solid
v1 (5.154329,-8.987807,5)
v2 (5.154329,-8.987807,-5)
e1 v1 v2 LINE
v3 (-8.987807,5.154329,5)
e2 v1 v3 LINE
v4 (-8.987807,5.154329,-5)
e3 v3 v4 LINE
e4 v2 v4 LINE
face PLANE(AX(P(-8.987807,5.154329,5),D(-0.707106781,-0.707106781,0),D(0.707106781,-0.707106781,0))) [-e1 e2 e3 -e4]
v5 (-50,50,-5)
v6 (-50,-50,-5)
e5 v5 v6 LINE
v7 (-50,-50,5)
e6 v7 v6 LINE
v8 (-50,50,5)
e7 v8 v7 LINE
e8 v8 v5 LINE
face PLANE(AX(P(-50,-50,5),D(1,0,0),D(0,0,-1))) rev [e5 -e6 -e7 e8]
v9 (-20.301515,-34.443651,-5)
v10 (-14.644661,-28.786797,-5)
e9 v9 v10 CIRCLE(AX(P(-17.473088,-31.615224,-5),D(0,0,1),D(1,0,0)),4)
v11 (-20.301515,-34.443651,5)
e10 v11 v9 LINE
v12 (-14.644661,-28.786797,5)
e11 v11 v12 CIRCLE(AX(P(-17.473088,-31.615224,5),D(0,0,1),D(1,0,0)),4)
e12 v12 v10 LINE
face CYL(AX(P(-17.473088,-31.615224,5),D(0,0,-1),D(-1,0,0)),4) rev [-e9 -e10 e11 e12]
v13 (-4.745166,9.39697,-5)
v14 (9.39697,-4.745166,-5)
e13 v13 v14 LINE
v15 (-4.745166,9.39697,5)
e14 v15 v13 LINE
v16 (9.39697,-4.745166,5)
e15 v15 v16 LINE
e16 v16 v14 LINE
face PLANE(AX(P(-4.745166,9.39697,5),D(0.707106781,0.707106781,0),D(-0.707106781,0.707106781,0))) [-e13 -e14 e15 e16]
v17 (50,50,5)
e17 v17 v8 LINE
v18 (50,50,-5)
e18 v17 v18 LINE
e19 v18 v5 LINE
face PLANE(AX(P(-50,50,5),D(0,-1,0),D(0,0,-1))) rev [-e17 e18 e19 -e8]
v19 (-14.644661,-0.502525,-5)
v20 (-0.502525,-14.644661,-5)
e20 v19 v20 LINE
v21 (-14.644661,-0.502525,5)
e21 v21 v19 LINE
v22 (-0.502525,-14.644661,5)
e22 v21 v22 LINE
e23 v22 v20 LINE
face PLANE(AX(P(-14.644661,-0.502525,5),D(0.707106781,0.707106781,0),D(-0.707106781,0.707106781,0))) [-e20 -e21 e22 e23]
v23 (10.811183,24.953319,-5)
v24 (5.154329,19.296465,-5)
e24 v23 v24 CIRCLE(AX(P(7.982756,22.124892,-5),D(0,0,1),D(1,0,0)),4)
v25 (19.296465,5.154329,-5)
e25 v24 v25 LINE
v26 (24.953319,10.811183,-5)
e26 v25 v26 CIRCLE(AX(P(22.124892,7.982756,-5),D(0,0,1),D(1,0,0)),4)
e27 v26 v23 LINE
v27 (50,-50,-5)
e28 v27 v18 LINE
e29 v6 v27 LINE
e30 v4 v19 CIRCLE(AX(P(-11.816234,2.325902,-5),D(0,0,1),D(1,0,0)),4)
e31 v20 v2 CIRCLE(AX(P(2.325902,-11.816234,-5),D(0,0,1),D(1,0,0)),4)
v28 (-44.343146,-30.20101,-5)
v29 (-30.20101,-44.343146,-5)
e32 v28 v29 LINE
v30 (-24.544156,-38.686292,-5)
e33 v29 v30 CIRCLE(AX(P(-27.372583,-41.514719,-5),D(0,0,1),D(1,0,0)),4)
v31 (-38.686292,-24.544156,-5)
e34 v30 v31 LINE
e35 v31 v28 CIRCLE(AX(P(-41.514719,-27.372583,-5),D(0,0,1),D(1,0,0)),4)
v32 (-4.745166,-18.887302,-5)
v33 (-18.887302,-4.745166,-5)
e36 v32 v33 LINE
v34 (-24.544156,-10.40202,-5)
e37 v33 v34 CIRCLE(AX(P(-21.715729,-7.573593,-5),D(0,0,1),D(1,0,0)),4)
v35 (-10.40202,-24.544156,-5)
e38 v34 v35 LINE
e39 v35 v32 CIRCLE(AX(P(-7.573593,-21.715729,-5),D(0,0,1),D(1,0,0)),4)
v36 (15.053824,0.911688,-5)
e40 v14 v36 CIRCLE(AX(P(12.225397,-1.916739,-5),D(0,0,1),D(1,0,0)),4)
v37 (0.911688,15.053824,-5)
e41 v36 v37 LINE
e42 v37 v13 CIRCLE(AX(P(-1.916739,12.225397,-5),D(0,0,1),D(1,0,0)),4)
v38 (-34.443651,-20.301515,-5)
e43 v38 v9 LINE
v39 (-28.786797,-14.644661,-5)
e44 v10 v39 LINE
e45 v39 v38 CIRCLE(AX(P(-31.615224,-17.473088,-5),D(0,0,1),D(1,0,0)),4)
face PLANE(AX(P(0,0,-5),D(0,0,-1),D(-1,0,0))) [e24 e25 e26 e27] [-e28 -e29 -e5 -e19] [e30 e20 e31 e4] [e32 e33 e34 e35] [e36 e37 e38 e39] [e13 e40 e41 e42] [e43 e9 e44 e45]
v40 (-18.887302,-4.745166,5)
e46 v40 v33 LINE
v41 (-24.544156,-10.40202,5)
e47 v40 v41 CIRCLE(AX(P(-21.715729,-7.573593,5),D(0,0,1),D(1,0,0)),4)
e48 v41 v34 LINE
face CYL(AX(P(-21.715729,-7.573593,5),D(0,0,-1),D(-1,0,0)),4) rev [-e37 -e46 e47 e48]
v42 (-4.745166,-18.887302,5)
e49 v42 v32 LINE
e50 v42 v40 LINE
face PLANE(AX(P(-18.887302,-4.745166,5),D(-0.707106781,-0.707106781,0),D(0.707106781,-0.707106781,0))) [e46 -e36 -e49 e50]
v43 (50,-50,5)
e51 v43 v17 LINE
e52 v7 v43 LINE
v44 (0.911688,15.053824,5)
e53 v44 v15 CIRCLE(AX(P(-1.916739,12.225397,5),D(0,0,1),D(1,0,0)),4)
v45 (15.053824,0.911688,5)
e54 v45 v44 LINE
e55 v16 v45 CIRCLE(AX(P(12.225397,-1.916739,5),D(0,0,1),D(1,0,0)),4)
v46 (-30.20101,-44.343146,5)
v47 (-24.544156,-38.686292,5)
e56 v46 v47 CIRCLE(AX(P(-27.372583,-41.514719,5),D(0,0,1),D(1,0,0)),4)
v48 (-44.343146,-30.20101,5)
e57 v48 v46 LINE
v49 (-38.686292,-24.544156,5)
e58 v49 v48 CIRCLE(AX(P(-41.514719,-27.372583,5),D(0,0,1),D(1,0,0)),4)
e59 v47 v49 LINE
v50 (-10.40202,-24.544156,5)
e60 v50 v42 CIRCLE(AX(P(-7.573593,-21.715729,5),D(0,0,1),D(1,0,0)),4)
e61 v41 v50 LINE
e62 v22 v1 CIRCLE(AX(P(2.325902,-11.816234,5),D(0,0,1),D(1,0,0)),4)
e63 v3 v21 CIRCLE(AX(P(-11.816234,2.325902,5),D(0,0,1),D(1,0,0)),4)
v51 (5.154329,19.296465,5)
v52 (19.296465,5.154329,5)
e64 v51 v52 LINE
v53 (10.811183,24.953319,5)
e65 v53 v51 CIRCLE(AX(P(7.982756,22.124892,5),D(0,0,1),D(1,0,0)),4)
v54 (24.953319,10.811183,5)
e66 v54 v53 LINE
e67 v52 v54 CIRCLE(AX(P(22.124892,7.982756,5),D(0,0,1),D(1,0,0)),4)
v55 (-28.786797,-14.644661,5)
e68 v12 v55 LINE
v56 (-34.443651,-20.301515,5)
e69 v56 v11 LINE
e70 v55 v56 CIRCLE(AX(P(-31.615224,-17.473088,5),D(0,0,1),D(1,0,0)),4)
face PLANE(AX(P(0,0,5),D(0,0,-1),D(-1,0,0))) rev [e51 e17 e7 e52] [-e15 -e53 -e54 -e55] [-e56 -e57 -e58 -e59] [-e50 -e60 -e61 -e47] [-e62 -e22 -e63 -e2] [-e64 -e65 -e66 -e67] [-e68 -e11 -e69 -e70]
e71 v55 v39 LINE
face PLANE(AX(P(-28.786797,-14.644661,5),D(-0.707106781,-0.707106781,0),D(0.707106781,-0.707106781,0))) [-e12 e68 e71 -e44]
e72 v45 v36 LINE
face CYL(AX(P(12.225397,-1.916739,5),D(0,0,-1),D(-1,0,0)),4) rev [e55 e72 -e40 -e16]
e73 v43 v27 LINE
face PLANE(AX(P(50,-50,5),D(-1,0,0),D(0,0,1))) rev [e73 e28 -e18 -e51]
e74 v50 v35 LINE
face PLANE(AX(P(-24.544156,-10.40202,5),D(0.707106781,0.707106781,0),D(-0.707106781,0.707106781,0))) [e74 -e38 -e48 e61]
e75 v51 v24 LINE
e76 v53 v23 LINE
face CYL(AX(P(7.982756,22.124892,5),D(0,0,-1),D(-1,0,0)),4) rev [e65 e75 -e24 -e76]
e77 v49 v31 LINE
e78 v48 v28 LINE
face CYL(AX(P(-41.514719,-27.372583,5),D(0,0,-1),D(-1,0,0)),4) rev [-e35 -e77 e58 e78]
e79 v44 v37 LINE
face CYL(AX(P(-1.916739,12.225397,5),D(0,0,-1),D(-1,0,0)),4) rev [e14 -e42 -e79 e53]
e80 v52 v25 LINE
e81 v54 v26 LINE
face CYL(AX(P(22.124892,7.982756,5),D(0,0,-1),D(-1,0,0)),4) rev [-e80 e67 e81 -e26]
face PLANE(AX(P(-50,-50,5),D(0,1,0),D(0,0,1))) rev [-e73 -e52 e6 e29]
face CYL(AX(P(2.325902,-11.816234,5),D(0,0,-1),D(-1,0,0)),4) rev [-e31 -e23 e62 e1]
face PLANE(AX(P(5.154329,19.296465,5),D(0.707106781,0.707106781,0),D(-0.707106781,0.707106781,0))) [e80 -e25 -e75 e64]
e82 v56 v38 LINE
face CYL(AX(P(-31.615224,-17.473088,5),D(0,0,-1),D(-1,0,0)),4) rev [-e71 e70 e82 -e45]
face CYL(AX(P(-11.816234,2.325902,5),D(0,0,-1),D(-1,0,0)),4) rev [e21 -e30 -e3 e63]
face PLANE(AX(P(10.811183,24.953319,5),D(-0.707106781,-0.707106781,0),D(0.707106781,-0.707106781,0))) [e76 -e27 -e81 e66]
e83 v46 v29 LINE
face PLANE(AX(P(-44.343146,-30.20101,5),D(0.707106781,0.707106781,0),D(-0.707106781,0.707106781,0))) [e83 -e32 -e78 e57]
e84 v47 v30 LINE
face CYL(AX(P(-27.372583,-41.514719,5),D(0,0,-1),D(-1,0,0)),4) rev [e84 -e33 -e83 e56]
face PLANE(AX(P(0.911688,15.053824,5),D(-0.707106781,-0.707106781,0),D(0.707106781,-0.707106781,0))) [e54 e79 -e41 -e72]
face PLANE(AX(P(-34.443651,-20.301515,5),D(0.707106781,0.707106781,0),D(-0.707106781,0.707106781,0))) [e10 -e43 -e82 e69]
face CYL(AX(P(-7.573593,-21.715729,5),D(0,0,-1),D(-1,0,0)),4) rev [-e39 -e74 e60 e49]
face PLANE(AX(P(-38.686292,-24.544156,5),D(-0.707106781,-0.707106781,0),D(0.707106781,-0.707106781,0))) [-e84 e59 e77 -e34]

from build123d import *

# Parameters (mm, degrees)
SKETCH1_W           = 100
SKETCH1_H           = 100
BOSS_EXTRUDE1_DEPTH = 5
LPATTERN2_START     = -5
LPATTERN2_DEPTH     = 10


# Read off the part's stored shape, not the designer's step: LPattern2
with BuildPart() as part:
    # Sketch1 → Boss-Extrude1 (new, symmetric)
    with BuildSketch(Plane.XY):
        Rectangle(SKETCH1_W, SKETCH1_H)
        with BuildLine():
            Line((-38.686291501, -24.544155877), (-24.544155877, -38.686291501))
            ThreePointArc((-24.544155877, -38.686291501), (-24.544155877, -44.343145751), (-30.201010127, -44.343145751))
            Line((-30.201010127, -44.343145751), (-44.343145751, -30.201010127))
            ThreePointArc((-44.343145751, -30.201010127), (-44.343145751, -24.544155877), (-38.686291501, -24.544155877))
        make_face(mode=Mode.SUBTRACT)
    extrude(amount=BOSS_EXTRUDE1_DEPTH, both=True)

    # LPattern2 outline → LPattern2 (cut)
    with BuildSketch(Plane.XY.offset(LPATTERN2_START)):
        with BuildLine():
            Line((24.953318806, 10.811183182), (10.811183182, 24.953318806))
            ThreePointArc((10.811183182, 24.953318806), (5.154328933, 24.953318806), (5.154328933, 19.296464556))
            Line((5.154328933, 19.296464556), (19.296464556, 5.154328933))
            ThreePointArc((19.296464556, 5.154328933), (24.953318806, 5.154328933), (24.953318806, 10.811183182))
        make_face()
        with BuildLine():
            Line((15.053823869, 0.911688245), (0.911688245, 15.053823869))
            ThreePointArc((0.911688245, 15.053823869), (-4.745166004, 15.053823869), (-4.745166004, 9.39696962))
            Line((-4.745166004, 9.39696962), (9.39696962, -4.745166004))
            ThreePointArc((9.39696962, -4.745166004), (15.053823869, -4.745166004), (15.053823869, 0.911688245))
        make_face()
        with BuildLine():
            Line((5.154328933, -8.987806691), (-8.987806691, 5.154328933))
            ThreePointArc((-8.987806691, 5.154328933), (-14.644660941, 5.154328933), (-14.644660941, -0.502525317))
            Line((-14.644660941, -0.502525317), (-0.502525317, -14.644660941))
            ThreePointArc((-0.502525317, -14.644660941), (5.154328933, -14.644660941), (5.154328933, -8.987806691))
        make_face()
        with BuildLine():
            Line((-4.745166004, -18.887301628), (-18.887301628, -4.745166004))
            ThreePointArc((-18.887301628, -4.745166004), (-24.544155877, -4.745166004), (-24.544155877, -10.402020254))
            Line((-24.544155877, -10.402020254), (-10.402020254, -24.544155877))
            ThreePointArc((-10.402020254, -24.544155877), (-4.745166004, -24.544155877), (-4.745166004, -18.887301628))
        make_face()
        with BuildLine():
            Line((-14.644660941, -28.786796564), (-28.786796564, -14.644660941))
            ThreePointArc((-28.786796564, -14.644660941), (-34.443650813, -14.64466094), (-34.443650814, -20.30151519))
            Line((-34.443650814, -20.30151519), (-20.30151519, -34.443650814))
            ThreePointArc((-20.30151519, -34.443650814), (-14.64466094, -34.443650813), (-14.644660941, -28.786796564))
        make_face()
    extrude(amount=LPATTERN2_DEPTH, mode=Mode.SUBTRACT)


solid = part.part
